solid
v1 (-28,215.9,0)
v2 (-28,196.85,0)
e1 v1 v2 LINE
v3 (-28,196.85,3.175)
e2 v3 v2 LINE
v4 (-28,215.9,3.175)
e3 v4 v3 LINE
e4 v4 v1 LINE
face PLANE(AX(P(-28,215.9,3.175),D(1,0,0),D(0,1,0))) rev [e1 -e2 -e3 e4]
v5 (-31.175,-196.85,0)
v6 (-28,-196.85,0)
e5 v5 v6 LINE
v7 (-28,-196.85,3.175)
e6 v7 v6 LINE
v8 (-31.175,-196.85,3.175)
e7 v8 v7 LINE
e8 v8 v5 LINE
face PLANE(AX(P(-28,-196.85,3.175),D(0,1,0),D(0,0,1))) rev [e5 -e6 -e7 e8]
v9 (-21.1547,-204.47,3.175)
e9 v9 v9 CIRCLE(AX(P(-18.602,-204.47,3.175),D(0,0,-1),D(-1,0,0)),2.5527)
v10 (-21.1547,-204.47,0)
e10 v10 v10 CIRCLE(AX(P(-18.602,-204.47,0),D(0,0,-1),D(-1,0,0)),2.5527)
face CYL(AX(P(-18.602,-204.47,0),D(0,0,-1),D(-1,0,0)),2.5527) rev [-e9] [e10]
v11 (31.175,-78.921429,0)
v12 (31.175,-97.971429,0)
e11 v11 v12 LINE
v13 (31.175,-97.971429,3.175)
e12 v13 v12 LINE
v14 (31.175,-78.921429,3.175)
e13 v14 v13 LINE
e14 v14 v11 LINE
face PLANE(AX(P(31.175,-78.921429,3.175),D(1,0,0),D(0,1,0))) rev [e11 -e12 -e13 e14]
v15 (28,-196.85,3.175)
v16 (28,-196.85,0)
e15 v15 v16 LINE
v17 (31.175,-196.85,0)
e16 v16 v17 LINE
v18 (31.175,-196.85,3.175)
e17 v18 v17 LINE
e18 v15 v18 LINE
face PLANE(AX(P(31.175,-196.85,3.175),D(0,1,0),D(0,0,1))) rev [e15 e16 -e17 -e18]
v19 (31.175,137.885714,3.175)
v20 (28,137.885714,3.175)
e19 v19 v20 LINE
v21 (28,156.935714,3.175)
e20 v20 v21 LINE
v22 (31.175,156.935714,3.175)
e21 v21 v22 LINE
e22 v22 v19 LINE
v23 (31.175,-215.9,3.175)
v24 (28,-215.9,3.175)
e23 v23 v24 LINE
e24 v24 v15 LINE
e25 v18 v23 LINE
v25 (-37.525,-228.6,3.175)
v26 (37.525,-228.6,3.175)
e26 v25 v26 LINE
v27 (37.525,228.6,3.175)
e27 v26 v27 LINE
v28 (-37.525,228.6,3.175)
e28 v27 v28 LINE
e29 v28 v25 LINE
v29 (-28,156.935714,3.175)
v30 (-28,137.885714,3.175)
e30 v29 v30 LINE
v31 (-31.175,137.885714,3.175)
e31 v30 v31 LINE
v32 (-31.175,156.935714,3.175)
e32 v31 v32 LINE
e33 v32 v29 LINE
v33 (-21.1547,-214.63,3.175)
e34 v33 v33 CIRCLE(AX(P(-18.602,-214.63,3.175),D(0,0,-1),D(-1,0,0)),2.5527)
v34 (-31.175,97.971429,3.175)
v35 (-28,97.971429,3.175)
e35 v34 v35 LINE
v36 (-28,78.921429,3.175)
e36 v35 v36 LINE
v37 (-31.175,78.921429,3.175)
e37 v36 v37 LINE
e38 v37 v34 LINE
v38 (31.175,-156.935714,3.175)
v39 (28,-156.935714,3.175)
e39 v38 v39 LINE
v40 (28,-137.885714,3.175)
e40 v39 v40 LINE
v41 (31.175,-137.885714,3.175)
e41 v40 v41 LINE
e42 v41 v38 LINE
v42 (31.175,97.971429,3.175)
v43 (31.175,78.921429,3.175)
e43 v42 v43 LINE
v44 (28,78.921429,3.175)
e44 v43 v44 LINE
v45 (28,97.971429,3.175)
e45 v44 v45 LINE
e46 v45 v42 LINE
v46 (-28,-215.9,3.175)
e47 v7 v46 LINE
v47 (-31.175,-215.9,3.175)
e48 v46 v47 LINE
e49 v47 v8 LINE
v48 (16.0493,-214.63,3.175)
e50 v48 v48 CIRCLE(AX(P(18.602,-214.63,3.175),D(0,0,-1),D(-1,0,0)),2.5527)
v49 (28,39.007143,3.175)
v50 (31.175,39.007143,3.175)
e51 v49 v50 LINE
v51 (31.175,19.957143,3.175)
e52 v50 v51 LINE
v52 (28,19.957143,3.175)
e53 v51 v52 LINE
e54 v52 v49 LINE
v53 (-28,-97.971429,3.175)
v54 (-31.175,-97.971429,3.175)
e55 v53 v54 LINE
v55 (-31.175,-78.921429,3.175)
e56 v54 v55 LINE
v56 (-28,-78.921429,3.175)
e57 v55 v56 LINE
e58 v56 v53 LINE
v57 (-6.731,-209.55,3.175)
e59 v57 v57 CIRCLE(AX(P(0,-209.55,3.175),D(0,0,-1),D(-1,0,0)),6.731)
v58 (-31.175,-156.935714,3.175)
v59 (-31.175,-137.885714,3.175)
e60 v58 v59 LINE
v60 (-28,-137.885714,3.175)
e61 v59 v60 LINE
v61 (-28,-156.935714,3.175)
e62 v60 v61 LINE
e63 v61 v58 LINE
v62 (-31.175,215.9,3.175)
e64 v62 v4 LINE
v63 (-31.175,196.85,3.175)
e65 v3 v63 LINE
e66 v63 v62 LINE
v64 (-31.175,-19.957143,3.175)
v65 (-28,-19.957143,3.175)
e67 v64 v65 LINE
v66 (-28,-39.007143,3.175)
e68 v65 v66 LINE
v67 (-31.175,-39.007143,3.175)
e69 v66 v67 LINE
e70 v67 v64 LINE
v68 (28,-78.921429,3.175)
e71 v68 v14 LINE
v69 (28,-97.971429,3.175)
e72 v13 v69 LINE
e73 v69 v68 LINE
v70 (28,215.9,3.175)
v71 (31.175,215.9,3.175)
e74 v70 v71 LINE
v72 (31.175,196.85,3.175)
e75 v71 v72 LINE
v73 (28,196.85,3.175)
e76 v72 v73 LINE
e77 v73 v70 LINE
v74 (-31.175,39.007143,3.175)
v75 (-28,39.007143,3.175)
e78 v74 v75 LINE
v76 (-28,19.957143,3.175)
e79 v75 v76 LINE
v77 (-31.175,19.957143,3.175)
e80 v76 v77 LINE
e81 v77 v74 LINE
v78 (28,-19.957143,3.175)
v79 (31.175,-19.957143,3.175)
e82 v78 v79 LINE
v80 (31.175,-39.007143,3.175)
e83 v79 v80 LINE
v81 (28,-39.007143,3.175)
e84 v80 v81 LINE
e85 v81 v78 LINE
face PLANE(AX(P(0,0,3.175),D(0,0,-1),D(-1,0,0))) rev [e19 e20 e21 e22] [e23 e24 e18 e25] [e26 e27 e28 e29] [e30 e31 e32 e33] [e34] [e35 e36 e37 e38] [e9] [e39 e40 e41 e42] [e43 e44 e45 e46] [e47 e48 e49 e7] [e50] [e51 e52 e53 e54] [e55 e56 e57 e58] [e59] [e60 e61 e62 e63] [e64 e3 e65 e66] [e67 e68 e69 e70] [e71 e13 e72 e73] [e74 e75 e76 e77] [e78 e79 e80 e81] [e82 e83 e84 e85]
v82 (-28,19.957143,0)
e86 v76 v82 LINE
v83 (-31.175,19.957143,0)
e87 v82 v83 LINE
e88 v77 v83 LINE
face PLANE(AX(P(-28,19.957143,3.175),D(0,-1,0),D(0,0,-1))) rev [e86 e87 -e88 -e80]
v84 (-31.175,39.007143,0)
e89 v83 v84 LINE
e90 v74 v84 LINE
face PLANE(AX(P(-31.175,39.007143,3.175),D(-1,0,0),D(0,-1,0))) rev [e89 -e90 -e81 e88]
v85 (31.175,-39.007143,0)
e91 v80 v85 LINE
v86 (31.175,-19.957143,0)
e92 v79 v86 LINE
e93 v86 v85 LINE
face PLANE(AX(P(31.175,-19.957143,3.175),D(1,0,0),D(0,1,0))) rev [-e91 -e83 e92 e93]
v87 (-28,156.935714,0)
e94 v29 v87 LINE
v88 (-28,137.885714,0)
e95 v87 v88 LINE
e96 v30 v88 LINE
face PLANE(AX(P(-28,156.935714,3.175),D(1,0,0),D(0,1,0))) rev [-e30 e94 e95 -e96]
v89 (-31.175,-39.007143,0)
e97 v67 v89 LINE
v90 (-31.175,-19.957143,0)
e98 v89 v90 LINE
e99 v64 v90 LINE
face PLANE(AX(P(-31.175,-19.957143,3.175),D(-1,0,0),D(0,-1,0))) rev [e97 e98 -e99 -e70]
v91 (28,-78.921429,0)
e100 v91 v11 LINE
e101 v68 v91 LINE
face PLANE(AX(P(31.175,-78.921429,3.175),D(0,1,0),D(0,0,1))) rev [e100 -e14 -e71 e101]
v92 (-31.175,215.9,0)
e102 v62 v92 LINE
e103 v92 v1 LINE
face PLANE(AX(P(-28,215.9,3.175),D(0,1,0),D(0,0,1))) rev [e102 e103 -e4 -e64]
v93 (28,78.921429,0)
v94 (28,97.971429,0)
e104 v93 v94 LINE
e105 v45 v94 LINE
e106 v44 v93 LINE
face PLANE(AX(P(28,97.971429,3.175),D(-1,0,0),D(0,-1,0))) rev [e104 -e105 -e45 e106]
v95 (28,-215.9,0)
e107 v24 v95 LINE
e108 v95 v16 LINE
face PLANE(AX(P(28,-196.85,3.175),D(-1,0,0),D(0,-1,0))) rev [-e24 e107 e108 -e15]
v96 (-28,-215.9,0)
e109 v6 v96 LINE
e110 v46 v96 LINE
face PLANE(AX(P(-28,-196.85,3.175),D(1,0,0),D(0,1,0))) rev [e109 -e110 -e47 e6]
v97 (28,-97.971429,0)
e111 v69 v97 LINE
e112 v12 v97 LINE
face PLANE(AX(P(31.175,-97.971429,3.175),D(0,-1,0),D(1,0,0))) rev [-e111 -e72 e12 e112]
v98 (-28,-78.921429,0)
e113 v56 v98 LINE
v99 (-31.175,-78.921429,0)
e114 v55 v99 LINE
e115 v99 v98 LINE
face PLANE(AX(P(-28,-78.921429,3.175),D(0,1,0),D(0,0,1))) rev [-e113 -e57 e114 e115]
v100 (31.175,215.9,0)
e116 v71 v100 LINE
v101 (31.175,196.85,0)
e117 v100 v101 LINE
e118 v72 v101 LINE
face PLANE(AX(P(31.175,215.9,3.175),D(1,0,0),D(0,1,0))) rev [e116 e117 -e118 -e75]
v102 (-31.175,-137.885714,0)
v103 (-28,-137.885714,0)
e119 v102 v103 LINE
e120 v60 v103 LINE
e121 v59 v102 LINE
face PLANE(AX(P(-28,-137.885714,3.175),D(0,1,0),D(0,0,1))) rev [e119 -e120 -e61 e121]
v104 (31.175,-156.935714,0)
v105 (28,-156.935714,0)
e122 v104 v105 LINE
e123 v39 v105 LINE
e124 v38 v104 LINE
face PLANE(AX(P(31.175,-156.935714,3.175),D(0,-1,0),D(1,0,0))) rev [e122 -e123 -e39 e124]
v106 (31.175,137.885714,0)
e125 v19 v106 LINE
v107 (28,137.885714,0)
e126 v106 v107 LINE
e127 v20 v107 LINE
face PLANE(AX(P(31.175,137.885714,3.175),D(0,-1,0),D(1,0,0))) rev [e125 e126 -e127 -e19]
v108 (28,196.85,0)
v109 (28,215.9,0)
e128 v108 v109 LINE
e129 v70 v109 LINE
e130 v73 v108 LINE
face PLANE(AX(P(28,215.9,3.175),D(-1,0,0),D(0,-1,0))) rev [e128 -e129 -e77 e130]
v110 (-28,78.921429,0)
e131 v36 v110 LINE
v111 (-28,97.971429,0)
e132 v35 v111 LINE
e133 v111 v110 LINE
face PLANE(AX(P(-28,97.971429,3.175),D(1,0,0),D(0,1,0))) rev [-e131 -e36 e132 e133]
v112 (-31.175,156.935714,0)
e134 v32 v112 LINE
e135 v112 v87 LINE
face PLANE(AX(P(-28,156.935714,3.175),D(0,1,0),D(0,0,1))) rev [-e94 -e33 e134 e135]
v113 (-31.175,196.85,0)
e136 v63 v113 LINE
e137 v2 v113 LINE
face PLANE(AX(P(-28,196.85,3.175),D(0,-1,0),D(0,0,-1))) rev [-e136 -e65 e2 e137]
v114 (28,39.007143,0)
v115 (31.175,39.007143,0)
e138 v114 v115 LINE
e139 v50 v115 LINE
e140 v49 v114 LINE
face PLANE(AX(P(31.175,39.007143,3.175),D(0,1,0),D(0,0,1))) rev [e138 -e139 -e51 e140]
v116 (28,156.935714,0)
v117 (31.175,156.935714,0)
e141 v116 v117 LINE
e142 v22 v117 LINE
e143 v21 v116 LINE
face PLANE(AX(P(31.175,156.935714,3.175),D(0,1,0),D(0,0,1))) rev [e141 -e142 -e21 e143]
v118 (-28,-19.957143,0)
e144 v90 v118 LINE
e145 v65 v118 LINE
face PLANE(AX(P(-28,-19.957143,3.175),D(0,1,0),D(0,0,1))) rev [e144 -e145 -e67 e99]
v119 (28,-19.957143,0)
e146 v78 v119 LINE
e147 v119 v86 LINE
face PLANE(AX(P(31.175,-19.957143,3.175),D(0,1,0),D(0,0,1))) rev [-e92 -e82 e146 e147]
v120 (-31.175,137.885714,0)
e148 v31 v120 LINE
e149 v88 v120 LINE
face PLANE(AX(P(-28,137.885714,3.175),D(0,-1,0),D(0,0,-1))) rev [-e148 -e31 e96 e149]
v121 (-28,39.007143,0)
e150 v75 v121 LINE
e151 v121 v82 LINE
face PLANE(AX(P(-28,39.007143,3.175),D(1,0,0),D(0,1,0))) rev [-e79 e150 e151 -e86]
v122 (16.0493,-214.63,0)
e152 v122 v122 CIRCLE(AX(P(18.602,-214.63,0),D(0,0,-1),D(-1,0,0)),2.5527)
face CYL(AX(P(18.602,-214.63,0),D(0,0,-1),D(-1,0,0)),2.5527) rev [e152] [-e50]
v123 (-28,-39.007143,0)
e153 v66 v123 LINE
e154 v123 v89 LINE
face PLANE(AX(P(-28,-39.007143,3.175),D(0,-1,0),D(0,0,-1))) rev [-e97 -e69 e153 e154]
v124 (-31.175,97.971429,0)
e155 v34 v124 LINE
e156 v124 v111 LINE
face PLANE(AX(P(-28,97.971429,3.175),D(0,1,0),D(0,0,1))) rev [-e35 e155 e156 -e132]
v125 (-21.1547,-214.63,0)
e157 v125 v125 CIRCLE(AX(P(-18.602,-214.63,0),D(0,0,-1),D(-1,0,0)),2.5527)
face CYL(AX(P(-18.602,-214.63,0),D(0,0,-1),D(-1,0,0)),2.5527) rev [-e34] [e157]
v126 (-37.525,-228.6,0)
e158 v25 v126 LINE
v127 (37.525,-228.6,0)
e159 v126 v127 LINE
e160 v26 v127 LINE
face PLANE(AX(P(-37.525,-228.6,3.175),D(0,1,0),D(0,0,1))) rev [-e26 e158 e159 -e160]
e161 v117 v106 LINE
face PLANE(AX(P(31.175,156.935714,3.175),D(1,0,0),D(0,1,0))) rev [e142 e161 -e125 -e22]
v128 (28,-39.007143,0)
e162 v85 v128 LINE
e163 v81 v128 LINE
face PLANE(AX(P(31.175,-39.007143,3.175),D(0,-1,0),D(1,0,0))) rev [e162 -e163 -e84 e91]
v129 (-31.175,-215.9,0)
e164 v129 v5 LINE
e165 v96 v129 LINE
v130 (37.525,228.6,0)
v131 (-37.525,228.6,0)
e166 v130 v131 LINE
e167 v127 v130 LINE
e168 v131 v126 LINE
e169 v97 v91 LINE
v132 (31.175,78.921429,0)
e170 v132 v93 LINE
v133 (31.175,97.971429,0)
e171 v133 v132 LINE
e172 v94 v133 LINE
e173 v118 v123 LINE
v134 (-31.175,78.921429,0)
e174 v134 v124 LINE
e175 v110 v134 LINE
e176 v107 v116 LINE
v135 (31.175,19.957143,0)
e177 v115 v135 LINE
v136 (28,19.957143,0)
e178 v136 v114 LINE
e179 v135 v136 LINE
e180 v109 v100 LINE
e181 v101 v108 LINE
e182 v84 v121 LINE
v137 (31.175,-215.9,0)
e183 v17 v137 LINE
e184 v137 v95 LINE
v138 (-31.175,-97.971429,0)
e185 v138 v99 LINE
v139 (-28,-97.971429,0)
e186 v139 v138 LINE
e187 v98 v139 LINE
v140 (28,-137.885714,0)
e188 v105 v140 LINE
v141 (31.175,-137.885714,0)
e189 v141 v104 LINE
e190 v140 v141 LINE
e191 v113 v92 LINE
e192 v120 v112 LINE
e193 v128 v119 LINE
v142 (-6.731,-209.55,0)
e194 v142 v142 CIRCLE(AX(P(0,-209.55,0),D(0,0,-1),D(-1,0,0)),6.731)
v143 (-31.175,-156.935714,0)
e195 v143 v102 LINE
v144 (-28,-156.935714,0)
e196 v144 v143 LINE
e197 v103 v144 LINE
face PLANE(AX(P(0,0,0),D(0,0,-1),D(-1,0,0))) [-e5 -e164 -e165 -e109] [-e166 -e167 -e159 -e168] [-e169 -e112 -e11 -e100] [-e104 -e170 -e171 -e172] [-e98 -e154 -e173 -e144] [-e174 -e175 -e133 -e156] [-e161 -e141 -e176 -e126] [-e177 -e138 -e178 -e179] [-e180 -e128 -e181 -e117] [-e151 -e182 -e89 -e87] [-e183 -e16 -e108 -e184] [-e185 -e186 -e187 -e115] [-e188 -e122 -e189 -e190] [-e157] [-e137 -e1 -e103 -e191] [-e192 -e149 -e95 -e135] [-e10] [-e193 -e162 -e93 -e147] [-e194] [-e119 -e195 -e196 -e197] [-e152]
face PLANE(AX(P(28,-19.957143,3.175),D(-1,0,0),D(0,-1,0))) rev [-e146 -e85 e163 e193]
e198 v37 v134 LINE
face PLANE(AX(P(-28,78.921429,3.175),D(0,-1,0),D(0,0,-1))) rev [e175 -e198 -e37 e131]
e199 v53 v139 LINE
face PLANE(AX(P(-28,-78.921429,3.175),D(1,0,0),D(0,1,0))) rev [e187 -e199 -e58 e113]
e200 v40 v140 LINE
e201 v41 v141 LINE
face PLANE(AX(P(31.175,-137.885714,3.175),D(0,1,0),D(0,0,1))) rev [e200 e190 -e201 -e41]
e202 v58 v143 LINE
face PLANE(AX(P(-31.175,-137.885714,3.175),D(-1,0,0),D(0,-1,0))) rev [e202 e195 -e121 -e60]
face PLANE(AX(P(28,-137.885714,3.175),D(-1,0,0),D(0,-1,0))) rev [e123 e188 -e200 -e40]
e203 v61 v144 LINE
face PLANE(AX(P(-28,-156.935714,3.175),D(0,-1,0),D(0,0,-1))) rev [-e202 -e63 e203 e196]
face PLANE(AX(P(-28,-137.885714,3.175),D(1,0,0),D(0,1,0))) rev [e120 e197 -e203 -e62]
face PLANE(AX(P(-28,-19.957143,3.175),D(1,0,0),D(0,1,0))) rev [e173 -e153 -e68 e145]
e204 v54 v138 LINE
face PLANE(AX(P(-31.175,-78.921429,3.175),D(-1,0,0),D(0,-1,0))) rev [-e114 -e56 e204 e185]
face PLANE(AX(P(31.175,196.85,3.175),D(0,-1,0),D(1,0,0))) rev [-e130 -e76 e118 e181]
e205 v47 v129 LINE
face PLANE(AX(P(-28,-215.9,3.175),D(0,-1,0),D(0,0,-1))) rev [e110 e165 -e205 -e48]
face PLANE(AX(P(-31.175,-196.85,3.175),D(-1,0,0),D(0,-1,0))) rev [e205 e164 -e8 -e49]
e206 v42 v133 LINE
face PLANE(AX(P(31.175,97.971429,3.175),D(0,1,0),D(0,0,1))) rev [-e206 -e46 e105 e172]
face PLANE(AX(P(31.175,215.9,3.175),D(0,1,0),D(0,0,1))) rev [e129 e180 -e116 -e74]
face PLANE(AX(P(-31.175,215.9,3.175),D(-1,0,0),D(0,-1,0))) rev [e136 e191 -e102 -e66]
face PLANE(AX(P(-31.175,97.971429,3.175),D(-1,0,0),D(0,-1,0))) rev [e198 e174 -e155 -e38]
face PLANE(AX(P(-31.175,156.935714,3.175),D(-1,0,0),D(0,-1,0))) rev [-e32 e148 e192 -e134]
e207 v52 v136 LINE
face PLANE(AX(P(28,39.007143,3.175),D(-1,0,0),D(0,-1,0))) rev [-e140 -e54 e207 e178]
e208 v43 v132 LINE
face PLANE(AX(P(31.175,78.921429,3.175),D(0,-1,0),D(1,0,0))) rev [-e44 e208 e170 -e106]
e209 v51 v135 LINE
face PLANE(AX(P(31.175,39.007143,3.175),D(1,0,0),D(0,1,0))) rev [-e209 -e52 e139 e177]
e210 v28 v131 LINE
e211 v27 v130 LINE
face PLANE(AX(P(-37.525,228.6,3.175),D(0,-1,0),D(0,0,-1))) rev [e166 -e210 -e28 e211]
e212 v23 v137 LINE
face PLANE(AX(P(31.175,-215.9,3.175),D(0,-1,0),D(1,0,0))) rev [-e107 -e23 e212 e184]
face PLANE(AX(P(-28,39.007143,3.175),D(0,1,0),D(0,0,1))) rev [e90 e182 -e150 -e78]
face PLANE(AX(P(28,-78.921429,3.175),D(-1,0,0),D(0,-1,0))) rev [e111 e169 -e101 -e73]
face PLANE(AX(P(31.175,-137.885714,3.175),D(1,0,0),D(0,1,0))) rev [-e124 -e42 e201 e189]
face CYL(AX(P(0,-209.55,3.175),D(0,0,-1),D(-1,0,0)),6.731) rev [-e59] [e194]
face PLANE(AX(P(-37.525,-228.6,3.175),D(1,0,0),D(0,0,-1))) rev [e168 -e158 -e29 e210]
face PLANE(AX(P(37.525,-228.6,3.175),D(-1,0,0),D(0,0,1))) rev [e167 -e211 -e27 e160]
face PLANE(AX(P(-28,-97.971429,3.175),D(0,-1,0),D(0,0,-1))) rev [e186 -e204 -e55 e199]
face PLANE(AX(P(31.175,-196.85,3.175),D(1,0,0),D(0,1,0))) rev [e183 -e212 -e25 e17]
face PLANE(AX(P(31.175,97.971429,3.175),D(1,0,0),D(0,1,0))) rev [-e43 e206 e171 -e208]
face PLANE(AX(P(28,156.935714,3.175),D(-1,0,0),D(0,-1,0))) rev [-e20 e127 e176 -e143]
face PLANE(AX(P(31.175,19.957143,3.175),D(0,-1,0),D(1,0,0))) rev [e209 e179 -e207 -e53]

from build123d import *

# Parameters (mm, degrees)
SKETCH1_W               = 75.050000014
SKETCH1_H               = 457.2
BOSS_EXTRUDE1_DEPTH     = 3.175
SKETCH8_W               = 3.175
SKETCH8_H               = 19.05
CUT_EXTRUDE2_DEPTH      = 232.681173708
CRVPATTERN1_START       = -31.175
CRVPATTERN1_OUTLINE_W   = 19.05
CRVPATTERN1_OUTLINE_H   = 3.175
CRVPATTERN1_DEPTH       = 3.175
CRVPATTERN1_START_2     = 28
CRVPATTERN1_2_OUTLINE_W = 19.05
CRVPATTERN1_2_OUTLINE_H = 3.175
CRVPATTERN1_2_DEPTH     = 3.175
SKETCH10_R              = 6.731
CUT_EXTRUDE3_DEPTH      = 232.681173708
F_10_CLEARANCE_HOLE1_D  = 5.1054


# Read off the part's stored shape, not the designer's step: CrvPattern1
with BuildPart() as part:
    # Sketch1 → Boss-Extrude1 (new body)
    with BuildSketch(Plane.XY):
        Rectangle(SKETCH1_W, SKETCH1_H)
    extrude(amount=BOSS_EXTRUDE1_DEPTH)

    # Sketch8 → Cut-Extrude2 (cut, through all)
    with BuildSketch(Plane(origin=(0, 0, 0), x_dir=(-1, 0, 0), z_dir=(0, 0, -1))):
        with Locations((-29.5875, 206.375)):
            Rectangle(SKETCH8_W, SKETCH8_H)
        with Locations((29.5875, 206.375)):
            Rectangle(SKETCH8_W, SKETCH8_H)
    extrude(amount=-CUT_EXTRUDE2_DEPTH, mode=Mode.SUBTRACT)

    # CrvPattern1 outline → CrvPattern1 (cut)
    with BuildSketch(Plane.YZ.offset(CRVPATTERN1_START)):
        with Locations((147.410714286, 1.5875)):
            Rectangle(CRVPATTERN1_OUTLINE_W, CRVPATTERN1_OUTLINE_H)
        with Locations((88.446428571, 1.5875)):
            Rectangle(CRVPATTERN1_OUTLINE_W, CRVPATTERN1_OUTLINE_H)
        with Locations((29.482142857, 1.5875)):
            Rectangle(CRVPATTERN1_OUTLINE_W, CRVPATTERN1_OUTLINE_H)
        with Locations((-29.482142857, 1.5875)):
            Rectangle(CRVPATTERN1_OUTLINE_W, CRVPATTERN1_OUTLINE_H)
        with Locations((-88.446428571, 1.5875)):
            Rectangle(CRVPATTERN1_OUTLINE_W, CRVPATTERN1_OUTLINE_H)
        with Locations((-147.410714286, 1.5875)):
            Rectangle(CRVPATTERN1_OUTLINE_W, CRVPATTERN1_OUTLINE_H)
        with Locations((-206.375, 1.5875)):
            Rectangle(CRVPATTERN1_OUTLINE_W, CRVPATTERN1_OUTLINE_H)
    extrude(amount=CRVPATTERN1_DEPTH, mode=Mode.SUBTRACT)

    # CrvPattern1 2 outline → CrvPattern1 2 (cut)
    with BuildSketch(Plane.YZ.offset(CRVPATTERN1_START_2)):
        with Locations((147.410714286, 1.5875)):
            Rectangle(CRVPATTERN1_2_OUTLINE_W, CRVPATTERN1_2_OUTLINE_H)
        with Locations((88.446428571, 1.5875)):
            Rectangle(CRVPATTERN1_2_OUTLINE_W, CRVPATTERN1_2_OUTLINE_H)
        with Locations((29.482142857, 1.5875)):
            Rectangle(CRVPATTERN1_2_OUTLINE_W, CRVPATTERN1_2_OUTLINE_H)
        with Locations((-29.482142857, 1.5875)):
            Rectangle(CRVPATTERN1_2_OUTLINE_W, CRVPATTERN1_2_OUTLINE_H)
        with Locations((-88.446428571, 1.5875)):
            Rectangle(CRVPATTERN1_2_OUTLINE_W, CRVPATTERN1_2_OUTLINE_H)
        with Locations((-147.410714286, 1.5875)):
            Rectangle(CRVPATTERN1_2_OUTLINE_W, CRVPATTERN1_2_OUTLINE_H)
        with Locations((-206.375, 1.5875)):
            Rectangle(CRVPATTERN1_2_OUTLINE_W, CRVPATTERN1_2_OUTLINE_H)
    extrude(amount=CRVPATTERN1_2_DEPTH, mode=Mode.SUBTRACT)

    # Sketch10 → Cut-Extrude3 (cut, through all)
    with BuildSketch(Plane(origin=(0, 0, 0), x_dir=(-1, 0, 0), z_dir=(0, 0, -1))):
        with Locations((0, -209.55)):
            Circle(SKETCH10_R)
    extrude(amount=-CUT_EXTRUDE3_DEPTH, mode=Mode.SUBTRACT)

    # #10 Clearance Hole1 (through all)
    with Locations(Plane(origin=(0, 0, 0), x_dir=(-1, 0, 0), z_dir=(0, 0, -1))):
        with Locations((18.602, -214.63), (18.602, -204.47), (-18.602, -214.63), (-18.602, -280.67)):
            Hole(F_10_CLEARANCE_HOLE1_D / 2)


solid = part.part
